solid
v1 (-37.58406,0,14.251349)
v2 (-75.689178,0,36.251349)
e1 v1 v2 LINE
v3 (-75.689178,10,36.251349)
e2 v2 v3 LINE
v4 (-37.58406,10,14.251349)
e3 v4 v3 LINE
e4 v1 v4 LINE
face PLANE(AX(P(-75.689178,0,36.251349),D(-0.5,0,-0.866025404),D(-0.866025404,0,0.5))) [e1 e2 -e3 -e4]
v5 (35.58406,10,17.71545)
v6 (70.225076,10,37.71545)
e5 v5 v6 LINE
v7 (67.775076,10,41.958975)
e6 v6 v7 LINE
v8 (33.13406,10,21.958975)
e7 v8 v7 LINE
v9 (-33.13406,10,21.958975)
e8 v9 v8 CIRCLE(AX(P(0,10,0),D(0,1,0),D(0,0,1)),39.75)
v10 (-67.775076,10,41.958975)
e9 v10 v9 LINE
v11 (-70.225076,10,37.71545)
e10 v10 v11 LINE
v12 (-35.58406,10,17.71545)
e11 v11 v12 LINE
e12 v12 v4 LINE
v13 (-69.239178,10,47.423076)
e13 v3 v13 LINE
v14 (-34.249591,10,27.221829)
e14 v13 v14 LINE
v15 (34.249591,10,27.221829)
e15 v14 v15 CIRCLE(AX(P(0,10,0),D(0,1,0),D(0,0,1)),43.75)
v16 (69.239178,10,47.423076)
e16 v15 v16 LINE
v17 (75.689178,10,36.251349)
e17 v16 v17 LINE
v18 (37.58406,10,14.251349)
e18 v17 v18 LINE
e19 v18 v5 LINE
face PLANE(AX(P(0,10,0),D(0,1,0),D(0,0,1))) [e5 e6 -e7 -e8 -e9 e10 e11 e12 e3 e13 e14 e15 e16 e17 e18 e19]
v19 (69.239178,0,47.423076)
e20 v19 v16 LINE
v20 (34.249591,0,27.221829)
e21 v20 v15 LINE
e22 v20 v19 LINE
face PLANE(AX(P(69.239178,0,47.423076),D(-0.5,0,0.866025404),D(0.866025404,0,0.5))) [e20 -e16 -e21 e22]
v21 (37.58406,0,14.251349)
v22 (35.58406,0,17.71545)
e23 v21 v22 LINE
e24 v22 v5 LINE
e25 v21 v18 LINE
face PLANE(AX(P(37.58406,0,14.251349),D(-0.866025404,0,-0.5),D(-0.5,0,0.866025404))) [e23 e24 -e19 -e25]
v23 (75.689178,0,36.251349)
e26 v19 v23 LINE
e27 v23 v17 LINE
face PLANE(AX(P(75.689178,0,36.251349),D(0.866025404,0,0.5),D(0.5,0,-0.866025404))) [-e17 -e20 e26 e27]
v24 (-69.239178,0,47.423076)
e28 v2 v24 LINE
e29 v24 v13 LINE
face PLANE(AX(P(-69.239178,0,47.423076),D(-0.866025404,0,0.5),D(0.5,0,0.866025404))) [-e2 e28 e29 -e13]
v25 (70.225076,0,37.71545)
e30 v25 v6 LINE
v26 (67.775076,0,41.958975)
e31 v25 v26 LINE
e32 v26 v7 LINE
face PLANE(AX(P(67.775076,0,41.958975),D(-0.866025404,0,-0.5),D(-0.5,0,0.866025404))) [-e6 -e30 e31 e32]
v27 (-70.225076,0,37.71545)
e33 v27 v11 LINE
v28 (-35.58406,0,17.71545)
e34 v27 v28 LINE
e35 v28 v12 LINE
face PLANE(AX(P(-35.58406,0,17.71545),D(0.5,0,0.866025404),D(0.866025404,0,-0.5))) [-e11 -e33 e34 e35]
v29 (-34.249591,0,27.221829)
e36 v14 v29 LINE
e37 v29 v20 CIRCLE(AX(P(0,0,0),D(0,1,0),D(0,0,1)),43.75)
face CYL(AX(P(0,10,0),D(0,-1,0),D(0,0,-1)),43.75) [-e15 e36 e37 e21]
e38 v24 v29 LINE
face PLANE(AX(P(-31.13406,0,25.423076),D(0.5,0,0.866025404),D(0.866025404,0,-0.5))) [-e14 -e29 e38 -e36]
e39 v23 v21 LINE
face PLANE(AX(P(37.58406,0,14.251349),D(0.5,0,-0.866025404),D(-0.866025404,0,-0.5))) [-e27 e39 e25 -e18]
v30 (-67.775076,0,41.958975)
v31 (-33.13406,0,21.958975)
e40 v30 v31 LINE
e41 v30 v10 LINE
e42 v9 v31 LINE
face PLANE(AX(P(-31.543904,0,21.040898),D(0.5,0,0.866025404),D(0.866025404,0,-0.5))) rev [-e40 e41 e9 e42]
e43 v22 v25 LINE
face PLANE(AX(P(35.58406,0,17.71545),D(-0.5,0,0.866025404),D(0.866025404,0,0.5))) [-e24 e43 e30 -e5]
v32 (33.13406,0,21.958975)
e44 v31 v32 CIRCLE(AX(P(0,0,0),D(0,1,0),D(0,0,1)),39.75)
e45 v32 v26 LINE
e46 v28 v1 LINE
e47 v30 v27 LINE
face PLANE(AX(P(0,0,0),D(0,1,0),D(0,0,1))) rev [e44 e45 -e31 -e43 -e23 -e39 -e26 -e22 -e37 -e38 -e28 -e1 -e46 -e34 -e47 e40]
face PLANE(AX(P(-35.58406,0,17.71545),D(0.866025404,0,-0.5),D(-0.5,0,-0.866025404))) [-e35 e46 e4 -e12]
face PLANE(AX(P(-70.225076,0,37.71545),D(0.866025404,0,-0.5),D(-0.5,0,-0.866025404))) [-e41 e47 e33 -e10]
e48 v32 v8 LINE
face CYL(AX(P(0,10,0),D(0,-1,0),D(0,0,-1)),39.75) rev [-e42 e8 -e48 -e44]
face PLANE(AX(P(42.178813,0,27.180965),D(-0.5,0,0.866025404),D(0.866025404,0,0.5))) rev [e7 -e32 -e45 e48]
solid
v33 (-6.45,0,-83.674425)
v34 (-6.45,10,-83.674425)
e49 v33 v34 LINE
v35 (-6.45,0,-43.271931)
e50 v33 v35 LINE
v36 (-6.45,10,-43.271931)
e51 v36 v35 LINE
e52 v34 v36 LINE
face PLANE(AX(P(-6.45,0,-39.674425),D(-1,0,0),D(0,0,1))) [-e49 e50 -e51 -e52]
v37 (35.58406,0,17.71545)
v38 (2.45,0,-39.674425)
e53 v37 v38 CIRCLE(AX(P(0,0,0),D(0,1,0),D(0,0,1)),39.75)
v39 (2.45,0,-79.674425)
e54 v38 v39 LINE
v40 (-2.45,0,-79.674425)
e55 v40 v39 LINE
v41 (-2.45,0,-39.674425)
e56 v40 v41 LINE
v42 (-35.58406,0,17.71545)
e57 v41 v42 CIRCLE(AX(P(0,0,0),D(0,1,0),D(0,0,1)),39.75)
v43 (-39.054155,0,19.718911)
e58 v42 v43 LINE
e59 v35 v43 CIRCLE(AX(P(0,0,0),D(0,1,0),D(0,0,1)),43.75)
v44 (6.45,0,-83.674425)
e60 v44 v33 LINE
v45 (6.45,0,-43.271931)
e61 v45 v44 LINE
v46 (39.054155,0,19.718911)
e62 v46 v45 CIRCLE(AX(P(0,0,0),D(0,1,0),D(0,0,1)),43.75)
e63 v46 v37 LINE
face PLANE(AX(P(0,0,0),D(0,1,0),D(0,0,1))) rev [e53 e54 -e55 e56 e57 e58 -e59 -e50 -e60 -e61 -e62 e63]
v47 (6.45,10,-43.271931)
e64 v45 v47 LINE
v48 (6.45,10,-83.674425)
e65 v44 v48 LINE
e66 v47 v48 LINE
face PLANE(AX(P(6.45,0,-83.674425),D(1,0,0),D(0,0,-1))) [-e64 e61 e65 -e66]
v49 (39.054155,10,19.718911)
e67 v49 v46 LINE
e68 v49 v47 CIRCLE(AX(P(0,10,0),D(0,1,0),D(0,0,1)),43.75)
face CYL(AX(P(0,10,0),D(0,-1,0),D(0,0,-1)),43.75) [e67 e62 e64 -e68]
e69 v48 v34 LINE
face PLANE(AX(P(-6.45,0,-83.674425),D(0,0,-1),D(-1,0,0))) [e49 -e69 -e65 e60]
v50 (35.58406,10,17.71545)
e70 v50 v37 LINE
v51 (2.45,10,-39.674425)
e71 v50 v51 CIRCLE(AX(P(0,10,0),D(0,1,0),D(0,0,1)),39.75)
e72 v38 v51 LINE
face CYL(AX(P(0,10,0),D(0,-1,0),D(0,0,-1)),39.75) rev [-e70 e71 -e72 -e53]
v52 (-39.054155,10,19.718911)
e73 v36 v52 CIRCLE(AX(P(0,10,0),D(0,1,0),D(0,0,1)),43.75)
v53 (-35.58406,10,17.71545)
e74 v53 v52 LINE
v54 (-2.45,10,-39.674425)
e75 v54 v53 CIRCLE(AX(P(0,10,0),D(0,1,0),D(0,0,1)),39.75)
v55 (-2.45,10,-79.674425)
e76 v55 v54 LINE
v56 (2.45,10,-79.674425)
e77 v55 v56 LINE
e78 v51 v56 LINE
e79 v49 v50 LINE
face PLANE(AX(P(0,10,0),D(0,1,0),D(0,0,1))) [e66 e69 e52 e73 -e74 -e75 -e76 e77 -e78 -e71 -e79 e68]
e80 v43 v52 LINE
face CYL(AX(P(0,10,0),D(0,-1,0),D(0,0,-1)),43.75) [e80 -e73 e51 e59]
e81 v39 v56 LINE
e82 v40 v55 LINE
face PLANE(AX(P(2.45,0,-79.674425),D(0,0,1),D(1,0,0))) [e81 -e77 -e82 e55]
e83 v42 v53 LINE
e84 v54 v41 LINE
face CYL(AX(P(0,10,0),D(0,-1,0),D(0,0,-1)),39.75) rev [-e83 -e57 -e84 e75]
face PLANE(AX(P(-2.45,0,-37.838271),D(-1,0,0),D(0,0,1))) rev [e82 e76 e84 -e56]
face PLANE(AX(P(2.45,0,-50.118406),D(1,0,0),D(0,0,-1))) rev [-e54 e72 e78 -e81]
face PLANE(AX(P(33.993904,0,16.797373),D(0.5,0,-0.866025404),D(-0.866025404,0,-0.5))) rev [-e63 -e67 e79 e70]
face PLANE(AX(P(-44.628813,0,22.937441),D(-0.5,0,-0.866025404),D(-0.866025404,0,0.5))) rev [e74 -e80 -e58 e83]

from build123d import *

# Parameters (mm, degrees)
SKETCH1_R           = 43.75
SKETCH1_R_2         = 39.75
BOSS_EXTRUDE1_DEPTH = 10
CUT_EXTRUDE1_DEPTH  = 63.674755684
BOSS_EXTRUDE2_DEPTH = 10
CIRPATTERN1_DEPTH   = 10
CIRPATTERN1_2_DEPTH = 10


# Read off the part's stored shape, not the designer's step: CirPattern1
with BuildPart() as part:
    # Sketch1 → Boss-Extrude1 (new body)
    with BuildSketch(Plane(origin=(0, 0, 0), x_dir=(1, 0, 0), z_dir=(0, 1, 0))):
        with Locations(Location((0, 0, 0), (0, 0, 270))):
            Circle(SKETCH1_R)
        with Locations(Location((0, 0, 0), (0, 0, 270))):
            Circle(SKETCH1_R_2, mode=Mode.SUBTRACT)
    extrude(amount=BOSS_EXTRUDE1_DEPTH)

    # Sketch2 → Cut-Extrude1 (cut, through all)
    with BuildSketch(Plane(origin=(0, 10, 0), x_dir=(1, 0, 0), z_dir=(0, 1, 0))):
        Polygon((0, 37.83827082), (-2.45, 37.83827082), (-2.45, 50.118406455), (1.287432584, 50.118406455), (2.45, 50.118406455), (2.45, 37.83827082), align=None)
    extrude(amount=-CUT_EXTRUDE1_DEPTH, mode=Mode.SUBTRACT)

    # Sketch3 → Boss-Extrude2 (add, through all)
    with BuildSketch(Plane(origin=(0, 10, 0), x_dir=(1, 0, 0), z_dir=(0, 1, 0))):
        Polygon((-2.45, 39.674425012), (-2.45, 79.674425012), (2.45, 79.674425012), (2.45, 39.674425012), (6.45, 39.674425012), (6.45, 83.674425012), (-6.45, 83.674425012), (-6.45, 39.674425012), align=None)
    extrude(amount=-BOSS_EXTRUDE2_DEPTH)

    # CirPattern1 outline → CirPattern1 (cut)
    with BuildSketch(Plane(origin=(0, 0, 0), x_dir=(1, 0, 0), z_dir=(0, 1, 0))):
        with BuildLine():
            ThreePointArc((-39.054155423, -19.718910827), (0, -43.75), (39.054155423, -19.718910827))
            Line((39.054155423, -19.718910827), (35.584059941, -17.715450267))
            ThreePointArc((35.584059941, -17.715450267), (0, -39.75), (-35.584059941, -17.715450267))
            Line((-35.584059941, -17.715450267), (-39.054155423, -19.718910827))
        make_face()
    extrude(amount=CIRPATTERN1_DEPTH, mode=Mode.SUBTRACT)


with BuildPart() as body_2:
    # CirPattern1 2 outline → CirPattern1 2 (new body)
    with BuildSketch(Plane(origin=(0, 0, 0), x_dir=(1, 0, 0), z_dir=(0, 1, 0))):
        with BuildLine():
            Line((67.775076092, -41.958974745), (33.134059941, -21.958974745))
            ThreePointArc((33.134059941, -21.958974745), (0, -39.75), (-33.134059941, -21.958974745))
            Line((-33.134059941, -21.958974745), (-67.775076092, -41.958974745))
            Line((-67.775076092, -41.958974745), (-70.225076092, -37.715450267))
            Line((-70.225076092, -37.715450267), (-35.584059941, -17.715450267))
            Line((-35.584059941, -17.715450267), (-37.584059941, -14.251348651))
            Line((-37.584059941, -14.251348651), (-75.689177707, -36.251348651))
            Line((-75.689177707, -36.251348651), (-69.239177707, -47.42307636))
            Line((-69.239177707, -47.42307636), (-34.249591392, -27.221829282))
            ThreePointArc((-34.249591392, -27.221829282), (0, -43.75), (34.249591392, -27.221829282))
            Line((34.249591392, -27.221829282), (69.239177707, -47.42307636))
            Line((69.239177707, -47.42307636), (75.689177707, -36.251348651))
            Line((75.689177707, -36.251348651), (37.584059941, -14.251348651))
            Line((37.584059941, -14.251348651), (35.584059941, -17.715450267))
            Line((35.584059941, -17.715450267), (70.225076092, -37.715450267))
            Line((70.225076092, -37.715450267), (67.775076092, -41.958974745))
        make_face()
    extrude(amount=CIRPATTERN1_2_DEPTH)


solid = Compound([part.part, body_2.part])
